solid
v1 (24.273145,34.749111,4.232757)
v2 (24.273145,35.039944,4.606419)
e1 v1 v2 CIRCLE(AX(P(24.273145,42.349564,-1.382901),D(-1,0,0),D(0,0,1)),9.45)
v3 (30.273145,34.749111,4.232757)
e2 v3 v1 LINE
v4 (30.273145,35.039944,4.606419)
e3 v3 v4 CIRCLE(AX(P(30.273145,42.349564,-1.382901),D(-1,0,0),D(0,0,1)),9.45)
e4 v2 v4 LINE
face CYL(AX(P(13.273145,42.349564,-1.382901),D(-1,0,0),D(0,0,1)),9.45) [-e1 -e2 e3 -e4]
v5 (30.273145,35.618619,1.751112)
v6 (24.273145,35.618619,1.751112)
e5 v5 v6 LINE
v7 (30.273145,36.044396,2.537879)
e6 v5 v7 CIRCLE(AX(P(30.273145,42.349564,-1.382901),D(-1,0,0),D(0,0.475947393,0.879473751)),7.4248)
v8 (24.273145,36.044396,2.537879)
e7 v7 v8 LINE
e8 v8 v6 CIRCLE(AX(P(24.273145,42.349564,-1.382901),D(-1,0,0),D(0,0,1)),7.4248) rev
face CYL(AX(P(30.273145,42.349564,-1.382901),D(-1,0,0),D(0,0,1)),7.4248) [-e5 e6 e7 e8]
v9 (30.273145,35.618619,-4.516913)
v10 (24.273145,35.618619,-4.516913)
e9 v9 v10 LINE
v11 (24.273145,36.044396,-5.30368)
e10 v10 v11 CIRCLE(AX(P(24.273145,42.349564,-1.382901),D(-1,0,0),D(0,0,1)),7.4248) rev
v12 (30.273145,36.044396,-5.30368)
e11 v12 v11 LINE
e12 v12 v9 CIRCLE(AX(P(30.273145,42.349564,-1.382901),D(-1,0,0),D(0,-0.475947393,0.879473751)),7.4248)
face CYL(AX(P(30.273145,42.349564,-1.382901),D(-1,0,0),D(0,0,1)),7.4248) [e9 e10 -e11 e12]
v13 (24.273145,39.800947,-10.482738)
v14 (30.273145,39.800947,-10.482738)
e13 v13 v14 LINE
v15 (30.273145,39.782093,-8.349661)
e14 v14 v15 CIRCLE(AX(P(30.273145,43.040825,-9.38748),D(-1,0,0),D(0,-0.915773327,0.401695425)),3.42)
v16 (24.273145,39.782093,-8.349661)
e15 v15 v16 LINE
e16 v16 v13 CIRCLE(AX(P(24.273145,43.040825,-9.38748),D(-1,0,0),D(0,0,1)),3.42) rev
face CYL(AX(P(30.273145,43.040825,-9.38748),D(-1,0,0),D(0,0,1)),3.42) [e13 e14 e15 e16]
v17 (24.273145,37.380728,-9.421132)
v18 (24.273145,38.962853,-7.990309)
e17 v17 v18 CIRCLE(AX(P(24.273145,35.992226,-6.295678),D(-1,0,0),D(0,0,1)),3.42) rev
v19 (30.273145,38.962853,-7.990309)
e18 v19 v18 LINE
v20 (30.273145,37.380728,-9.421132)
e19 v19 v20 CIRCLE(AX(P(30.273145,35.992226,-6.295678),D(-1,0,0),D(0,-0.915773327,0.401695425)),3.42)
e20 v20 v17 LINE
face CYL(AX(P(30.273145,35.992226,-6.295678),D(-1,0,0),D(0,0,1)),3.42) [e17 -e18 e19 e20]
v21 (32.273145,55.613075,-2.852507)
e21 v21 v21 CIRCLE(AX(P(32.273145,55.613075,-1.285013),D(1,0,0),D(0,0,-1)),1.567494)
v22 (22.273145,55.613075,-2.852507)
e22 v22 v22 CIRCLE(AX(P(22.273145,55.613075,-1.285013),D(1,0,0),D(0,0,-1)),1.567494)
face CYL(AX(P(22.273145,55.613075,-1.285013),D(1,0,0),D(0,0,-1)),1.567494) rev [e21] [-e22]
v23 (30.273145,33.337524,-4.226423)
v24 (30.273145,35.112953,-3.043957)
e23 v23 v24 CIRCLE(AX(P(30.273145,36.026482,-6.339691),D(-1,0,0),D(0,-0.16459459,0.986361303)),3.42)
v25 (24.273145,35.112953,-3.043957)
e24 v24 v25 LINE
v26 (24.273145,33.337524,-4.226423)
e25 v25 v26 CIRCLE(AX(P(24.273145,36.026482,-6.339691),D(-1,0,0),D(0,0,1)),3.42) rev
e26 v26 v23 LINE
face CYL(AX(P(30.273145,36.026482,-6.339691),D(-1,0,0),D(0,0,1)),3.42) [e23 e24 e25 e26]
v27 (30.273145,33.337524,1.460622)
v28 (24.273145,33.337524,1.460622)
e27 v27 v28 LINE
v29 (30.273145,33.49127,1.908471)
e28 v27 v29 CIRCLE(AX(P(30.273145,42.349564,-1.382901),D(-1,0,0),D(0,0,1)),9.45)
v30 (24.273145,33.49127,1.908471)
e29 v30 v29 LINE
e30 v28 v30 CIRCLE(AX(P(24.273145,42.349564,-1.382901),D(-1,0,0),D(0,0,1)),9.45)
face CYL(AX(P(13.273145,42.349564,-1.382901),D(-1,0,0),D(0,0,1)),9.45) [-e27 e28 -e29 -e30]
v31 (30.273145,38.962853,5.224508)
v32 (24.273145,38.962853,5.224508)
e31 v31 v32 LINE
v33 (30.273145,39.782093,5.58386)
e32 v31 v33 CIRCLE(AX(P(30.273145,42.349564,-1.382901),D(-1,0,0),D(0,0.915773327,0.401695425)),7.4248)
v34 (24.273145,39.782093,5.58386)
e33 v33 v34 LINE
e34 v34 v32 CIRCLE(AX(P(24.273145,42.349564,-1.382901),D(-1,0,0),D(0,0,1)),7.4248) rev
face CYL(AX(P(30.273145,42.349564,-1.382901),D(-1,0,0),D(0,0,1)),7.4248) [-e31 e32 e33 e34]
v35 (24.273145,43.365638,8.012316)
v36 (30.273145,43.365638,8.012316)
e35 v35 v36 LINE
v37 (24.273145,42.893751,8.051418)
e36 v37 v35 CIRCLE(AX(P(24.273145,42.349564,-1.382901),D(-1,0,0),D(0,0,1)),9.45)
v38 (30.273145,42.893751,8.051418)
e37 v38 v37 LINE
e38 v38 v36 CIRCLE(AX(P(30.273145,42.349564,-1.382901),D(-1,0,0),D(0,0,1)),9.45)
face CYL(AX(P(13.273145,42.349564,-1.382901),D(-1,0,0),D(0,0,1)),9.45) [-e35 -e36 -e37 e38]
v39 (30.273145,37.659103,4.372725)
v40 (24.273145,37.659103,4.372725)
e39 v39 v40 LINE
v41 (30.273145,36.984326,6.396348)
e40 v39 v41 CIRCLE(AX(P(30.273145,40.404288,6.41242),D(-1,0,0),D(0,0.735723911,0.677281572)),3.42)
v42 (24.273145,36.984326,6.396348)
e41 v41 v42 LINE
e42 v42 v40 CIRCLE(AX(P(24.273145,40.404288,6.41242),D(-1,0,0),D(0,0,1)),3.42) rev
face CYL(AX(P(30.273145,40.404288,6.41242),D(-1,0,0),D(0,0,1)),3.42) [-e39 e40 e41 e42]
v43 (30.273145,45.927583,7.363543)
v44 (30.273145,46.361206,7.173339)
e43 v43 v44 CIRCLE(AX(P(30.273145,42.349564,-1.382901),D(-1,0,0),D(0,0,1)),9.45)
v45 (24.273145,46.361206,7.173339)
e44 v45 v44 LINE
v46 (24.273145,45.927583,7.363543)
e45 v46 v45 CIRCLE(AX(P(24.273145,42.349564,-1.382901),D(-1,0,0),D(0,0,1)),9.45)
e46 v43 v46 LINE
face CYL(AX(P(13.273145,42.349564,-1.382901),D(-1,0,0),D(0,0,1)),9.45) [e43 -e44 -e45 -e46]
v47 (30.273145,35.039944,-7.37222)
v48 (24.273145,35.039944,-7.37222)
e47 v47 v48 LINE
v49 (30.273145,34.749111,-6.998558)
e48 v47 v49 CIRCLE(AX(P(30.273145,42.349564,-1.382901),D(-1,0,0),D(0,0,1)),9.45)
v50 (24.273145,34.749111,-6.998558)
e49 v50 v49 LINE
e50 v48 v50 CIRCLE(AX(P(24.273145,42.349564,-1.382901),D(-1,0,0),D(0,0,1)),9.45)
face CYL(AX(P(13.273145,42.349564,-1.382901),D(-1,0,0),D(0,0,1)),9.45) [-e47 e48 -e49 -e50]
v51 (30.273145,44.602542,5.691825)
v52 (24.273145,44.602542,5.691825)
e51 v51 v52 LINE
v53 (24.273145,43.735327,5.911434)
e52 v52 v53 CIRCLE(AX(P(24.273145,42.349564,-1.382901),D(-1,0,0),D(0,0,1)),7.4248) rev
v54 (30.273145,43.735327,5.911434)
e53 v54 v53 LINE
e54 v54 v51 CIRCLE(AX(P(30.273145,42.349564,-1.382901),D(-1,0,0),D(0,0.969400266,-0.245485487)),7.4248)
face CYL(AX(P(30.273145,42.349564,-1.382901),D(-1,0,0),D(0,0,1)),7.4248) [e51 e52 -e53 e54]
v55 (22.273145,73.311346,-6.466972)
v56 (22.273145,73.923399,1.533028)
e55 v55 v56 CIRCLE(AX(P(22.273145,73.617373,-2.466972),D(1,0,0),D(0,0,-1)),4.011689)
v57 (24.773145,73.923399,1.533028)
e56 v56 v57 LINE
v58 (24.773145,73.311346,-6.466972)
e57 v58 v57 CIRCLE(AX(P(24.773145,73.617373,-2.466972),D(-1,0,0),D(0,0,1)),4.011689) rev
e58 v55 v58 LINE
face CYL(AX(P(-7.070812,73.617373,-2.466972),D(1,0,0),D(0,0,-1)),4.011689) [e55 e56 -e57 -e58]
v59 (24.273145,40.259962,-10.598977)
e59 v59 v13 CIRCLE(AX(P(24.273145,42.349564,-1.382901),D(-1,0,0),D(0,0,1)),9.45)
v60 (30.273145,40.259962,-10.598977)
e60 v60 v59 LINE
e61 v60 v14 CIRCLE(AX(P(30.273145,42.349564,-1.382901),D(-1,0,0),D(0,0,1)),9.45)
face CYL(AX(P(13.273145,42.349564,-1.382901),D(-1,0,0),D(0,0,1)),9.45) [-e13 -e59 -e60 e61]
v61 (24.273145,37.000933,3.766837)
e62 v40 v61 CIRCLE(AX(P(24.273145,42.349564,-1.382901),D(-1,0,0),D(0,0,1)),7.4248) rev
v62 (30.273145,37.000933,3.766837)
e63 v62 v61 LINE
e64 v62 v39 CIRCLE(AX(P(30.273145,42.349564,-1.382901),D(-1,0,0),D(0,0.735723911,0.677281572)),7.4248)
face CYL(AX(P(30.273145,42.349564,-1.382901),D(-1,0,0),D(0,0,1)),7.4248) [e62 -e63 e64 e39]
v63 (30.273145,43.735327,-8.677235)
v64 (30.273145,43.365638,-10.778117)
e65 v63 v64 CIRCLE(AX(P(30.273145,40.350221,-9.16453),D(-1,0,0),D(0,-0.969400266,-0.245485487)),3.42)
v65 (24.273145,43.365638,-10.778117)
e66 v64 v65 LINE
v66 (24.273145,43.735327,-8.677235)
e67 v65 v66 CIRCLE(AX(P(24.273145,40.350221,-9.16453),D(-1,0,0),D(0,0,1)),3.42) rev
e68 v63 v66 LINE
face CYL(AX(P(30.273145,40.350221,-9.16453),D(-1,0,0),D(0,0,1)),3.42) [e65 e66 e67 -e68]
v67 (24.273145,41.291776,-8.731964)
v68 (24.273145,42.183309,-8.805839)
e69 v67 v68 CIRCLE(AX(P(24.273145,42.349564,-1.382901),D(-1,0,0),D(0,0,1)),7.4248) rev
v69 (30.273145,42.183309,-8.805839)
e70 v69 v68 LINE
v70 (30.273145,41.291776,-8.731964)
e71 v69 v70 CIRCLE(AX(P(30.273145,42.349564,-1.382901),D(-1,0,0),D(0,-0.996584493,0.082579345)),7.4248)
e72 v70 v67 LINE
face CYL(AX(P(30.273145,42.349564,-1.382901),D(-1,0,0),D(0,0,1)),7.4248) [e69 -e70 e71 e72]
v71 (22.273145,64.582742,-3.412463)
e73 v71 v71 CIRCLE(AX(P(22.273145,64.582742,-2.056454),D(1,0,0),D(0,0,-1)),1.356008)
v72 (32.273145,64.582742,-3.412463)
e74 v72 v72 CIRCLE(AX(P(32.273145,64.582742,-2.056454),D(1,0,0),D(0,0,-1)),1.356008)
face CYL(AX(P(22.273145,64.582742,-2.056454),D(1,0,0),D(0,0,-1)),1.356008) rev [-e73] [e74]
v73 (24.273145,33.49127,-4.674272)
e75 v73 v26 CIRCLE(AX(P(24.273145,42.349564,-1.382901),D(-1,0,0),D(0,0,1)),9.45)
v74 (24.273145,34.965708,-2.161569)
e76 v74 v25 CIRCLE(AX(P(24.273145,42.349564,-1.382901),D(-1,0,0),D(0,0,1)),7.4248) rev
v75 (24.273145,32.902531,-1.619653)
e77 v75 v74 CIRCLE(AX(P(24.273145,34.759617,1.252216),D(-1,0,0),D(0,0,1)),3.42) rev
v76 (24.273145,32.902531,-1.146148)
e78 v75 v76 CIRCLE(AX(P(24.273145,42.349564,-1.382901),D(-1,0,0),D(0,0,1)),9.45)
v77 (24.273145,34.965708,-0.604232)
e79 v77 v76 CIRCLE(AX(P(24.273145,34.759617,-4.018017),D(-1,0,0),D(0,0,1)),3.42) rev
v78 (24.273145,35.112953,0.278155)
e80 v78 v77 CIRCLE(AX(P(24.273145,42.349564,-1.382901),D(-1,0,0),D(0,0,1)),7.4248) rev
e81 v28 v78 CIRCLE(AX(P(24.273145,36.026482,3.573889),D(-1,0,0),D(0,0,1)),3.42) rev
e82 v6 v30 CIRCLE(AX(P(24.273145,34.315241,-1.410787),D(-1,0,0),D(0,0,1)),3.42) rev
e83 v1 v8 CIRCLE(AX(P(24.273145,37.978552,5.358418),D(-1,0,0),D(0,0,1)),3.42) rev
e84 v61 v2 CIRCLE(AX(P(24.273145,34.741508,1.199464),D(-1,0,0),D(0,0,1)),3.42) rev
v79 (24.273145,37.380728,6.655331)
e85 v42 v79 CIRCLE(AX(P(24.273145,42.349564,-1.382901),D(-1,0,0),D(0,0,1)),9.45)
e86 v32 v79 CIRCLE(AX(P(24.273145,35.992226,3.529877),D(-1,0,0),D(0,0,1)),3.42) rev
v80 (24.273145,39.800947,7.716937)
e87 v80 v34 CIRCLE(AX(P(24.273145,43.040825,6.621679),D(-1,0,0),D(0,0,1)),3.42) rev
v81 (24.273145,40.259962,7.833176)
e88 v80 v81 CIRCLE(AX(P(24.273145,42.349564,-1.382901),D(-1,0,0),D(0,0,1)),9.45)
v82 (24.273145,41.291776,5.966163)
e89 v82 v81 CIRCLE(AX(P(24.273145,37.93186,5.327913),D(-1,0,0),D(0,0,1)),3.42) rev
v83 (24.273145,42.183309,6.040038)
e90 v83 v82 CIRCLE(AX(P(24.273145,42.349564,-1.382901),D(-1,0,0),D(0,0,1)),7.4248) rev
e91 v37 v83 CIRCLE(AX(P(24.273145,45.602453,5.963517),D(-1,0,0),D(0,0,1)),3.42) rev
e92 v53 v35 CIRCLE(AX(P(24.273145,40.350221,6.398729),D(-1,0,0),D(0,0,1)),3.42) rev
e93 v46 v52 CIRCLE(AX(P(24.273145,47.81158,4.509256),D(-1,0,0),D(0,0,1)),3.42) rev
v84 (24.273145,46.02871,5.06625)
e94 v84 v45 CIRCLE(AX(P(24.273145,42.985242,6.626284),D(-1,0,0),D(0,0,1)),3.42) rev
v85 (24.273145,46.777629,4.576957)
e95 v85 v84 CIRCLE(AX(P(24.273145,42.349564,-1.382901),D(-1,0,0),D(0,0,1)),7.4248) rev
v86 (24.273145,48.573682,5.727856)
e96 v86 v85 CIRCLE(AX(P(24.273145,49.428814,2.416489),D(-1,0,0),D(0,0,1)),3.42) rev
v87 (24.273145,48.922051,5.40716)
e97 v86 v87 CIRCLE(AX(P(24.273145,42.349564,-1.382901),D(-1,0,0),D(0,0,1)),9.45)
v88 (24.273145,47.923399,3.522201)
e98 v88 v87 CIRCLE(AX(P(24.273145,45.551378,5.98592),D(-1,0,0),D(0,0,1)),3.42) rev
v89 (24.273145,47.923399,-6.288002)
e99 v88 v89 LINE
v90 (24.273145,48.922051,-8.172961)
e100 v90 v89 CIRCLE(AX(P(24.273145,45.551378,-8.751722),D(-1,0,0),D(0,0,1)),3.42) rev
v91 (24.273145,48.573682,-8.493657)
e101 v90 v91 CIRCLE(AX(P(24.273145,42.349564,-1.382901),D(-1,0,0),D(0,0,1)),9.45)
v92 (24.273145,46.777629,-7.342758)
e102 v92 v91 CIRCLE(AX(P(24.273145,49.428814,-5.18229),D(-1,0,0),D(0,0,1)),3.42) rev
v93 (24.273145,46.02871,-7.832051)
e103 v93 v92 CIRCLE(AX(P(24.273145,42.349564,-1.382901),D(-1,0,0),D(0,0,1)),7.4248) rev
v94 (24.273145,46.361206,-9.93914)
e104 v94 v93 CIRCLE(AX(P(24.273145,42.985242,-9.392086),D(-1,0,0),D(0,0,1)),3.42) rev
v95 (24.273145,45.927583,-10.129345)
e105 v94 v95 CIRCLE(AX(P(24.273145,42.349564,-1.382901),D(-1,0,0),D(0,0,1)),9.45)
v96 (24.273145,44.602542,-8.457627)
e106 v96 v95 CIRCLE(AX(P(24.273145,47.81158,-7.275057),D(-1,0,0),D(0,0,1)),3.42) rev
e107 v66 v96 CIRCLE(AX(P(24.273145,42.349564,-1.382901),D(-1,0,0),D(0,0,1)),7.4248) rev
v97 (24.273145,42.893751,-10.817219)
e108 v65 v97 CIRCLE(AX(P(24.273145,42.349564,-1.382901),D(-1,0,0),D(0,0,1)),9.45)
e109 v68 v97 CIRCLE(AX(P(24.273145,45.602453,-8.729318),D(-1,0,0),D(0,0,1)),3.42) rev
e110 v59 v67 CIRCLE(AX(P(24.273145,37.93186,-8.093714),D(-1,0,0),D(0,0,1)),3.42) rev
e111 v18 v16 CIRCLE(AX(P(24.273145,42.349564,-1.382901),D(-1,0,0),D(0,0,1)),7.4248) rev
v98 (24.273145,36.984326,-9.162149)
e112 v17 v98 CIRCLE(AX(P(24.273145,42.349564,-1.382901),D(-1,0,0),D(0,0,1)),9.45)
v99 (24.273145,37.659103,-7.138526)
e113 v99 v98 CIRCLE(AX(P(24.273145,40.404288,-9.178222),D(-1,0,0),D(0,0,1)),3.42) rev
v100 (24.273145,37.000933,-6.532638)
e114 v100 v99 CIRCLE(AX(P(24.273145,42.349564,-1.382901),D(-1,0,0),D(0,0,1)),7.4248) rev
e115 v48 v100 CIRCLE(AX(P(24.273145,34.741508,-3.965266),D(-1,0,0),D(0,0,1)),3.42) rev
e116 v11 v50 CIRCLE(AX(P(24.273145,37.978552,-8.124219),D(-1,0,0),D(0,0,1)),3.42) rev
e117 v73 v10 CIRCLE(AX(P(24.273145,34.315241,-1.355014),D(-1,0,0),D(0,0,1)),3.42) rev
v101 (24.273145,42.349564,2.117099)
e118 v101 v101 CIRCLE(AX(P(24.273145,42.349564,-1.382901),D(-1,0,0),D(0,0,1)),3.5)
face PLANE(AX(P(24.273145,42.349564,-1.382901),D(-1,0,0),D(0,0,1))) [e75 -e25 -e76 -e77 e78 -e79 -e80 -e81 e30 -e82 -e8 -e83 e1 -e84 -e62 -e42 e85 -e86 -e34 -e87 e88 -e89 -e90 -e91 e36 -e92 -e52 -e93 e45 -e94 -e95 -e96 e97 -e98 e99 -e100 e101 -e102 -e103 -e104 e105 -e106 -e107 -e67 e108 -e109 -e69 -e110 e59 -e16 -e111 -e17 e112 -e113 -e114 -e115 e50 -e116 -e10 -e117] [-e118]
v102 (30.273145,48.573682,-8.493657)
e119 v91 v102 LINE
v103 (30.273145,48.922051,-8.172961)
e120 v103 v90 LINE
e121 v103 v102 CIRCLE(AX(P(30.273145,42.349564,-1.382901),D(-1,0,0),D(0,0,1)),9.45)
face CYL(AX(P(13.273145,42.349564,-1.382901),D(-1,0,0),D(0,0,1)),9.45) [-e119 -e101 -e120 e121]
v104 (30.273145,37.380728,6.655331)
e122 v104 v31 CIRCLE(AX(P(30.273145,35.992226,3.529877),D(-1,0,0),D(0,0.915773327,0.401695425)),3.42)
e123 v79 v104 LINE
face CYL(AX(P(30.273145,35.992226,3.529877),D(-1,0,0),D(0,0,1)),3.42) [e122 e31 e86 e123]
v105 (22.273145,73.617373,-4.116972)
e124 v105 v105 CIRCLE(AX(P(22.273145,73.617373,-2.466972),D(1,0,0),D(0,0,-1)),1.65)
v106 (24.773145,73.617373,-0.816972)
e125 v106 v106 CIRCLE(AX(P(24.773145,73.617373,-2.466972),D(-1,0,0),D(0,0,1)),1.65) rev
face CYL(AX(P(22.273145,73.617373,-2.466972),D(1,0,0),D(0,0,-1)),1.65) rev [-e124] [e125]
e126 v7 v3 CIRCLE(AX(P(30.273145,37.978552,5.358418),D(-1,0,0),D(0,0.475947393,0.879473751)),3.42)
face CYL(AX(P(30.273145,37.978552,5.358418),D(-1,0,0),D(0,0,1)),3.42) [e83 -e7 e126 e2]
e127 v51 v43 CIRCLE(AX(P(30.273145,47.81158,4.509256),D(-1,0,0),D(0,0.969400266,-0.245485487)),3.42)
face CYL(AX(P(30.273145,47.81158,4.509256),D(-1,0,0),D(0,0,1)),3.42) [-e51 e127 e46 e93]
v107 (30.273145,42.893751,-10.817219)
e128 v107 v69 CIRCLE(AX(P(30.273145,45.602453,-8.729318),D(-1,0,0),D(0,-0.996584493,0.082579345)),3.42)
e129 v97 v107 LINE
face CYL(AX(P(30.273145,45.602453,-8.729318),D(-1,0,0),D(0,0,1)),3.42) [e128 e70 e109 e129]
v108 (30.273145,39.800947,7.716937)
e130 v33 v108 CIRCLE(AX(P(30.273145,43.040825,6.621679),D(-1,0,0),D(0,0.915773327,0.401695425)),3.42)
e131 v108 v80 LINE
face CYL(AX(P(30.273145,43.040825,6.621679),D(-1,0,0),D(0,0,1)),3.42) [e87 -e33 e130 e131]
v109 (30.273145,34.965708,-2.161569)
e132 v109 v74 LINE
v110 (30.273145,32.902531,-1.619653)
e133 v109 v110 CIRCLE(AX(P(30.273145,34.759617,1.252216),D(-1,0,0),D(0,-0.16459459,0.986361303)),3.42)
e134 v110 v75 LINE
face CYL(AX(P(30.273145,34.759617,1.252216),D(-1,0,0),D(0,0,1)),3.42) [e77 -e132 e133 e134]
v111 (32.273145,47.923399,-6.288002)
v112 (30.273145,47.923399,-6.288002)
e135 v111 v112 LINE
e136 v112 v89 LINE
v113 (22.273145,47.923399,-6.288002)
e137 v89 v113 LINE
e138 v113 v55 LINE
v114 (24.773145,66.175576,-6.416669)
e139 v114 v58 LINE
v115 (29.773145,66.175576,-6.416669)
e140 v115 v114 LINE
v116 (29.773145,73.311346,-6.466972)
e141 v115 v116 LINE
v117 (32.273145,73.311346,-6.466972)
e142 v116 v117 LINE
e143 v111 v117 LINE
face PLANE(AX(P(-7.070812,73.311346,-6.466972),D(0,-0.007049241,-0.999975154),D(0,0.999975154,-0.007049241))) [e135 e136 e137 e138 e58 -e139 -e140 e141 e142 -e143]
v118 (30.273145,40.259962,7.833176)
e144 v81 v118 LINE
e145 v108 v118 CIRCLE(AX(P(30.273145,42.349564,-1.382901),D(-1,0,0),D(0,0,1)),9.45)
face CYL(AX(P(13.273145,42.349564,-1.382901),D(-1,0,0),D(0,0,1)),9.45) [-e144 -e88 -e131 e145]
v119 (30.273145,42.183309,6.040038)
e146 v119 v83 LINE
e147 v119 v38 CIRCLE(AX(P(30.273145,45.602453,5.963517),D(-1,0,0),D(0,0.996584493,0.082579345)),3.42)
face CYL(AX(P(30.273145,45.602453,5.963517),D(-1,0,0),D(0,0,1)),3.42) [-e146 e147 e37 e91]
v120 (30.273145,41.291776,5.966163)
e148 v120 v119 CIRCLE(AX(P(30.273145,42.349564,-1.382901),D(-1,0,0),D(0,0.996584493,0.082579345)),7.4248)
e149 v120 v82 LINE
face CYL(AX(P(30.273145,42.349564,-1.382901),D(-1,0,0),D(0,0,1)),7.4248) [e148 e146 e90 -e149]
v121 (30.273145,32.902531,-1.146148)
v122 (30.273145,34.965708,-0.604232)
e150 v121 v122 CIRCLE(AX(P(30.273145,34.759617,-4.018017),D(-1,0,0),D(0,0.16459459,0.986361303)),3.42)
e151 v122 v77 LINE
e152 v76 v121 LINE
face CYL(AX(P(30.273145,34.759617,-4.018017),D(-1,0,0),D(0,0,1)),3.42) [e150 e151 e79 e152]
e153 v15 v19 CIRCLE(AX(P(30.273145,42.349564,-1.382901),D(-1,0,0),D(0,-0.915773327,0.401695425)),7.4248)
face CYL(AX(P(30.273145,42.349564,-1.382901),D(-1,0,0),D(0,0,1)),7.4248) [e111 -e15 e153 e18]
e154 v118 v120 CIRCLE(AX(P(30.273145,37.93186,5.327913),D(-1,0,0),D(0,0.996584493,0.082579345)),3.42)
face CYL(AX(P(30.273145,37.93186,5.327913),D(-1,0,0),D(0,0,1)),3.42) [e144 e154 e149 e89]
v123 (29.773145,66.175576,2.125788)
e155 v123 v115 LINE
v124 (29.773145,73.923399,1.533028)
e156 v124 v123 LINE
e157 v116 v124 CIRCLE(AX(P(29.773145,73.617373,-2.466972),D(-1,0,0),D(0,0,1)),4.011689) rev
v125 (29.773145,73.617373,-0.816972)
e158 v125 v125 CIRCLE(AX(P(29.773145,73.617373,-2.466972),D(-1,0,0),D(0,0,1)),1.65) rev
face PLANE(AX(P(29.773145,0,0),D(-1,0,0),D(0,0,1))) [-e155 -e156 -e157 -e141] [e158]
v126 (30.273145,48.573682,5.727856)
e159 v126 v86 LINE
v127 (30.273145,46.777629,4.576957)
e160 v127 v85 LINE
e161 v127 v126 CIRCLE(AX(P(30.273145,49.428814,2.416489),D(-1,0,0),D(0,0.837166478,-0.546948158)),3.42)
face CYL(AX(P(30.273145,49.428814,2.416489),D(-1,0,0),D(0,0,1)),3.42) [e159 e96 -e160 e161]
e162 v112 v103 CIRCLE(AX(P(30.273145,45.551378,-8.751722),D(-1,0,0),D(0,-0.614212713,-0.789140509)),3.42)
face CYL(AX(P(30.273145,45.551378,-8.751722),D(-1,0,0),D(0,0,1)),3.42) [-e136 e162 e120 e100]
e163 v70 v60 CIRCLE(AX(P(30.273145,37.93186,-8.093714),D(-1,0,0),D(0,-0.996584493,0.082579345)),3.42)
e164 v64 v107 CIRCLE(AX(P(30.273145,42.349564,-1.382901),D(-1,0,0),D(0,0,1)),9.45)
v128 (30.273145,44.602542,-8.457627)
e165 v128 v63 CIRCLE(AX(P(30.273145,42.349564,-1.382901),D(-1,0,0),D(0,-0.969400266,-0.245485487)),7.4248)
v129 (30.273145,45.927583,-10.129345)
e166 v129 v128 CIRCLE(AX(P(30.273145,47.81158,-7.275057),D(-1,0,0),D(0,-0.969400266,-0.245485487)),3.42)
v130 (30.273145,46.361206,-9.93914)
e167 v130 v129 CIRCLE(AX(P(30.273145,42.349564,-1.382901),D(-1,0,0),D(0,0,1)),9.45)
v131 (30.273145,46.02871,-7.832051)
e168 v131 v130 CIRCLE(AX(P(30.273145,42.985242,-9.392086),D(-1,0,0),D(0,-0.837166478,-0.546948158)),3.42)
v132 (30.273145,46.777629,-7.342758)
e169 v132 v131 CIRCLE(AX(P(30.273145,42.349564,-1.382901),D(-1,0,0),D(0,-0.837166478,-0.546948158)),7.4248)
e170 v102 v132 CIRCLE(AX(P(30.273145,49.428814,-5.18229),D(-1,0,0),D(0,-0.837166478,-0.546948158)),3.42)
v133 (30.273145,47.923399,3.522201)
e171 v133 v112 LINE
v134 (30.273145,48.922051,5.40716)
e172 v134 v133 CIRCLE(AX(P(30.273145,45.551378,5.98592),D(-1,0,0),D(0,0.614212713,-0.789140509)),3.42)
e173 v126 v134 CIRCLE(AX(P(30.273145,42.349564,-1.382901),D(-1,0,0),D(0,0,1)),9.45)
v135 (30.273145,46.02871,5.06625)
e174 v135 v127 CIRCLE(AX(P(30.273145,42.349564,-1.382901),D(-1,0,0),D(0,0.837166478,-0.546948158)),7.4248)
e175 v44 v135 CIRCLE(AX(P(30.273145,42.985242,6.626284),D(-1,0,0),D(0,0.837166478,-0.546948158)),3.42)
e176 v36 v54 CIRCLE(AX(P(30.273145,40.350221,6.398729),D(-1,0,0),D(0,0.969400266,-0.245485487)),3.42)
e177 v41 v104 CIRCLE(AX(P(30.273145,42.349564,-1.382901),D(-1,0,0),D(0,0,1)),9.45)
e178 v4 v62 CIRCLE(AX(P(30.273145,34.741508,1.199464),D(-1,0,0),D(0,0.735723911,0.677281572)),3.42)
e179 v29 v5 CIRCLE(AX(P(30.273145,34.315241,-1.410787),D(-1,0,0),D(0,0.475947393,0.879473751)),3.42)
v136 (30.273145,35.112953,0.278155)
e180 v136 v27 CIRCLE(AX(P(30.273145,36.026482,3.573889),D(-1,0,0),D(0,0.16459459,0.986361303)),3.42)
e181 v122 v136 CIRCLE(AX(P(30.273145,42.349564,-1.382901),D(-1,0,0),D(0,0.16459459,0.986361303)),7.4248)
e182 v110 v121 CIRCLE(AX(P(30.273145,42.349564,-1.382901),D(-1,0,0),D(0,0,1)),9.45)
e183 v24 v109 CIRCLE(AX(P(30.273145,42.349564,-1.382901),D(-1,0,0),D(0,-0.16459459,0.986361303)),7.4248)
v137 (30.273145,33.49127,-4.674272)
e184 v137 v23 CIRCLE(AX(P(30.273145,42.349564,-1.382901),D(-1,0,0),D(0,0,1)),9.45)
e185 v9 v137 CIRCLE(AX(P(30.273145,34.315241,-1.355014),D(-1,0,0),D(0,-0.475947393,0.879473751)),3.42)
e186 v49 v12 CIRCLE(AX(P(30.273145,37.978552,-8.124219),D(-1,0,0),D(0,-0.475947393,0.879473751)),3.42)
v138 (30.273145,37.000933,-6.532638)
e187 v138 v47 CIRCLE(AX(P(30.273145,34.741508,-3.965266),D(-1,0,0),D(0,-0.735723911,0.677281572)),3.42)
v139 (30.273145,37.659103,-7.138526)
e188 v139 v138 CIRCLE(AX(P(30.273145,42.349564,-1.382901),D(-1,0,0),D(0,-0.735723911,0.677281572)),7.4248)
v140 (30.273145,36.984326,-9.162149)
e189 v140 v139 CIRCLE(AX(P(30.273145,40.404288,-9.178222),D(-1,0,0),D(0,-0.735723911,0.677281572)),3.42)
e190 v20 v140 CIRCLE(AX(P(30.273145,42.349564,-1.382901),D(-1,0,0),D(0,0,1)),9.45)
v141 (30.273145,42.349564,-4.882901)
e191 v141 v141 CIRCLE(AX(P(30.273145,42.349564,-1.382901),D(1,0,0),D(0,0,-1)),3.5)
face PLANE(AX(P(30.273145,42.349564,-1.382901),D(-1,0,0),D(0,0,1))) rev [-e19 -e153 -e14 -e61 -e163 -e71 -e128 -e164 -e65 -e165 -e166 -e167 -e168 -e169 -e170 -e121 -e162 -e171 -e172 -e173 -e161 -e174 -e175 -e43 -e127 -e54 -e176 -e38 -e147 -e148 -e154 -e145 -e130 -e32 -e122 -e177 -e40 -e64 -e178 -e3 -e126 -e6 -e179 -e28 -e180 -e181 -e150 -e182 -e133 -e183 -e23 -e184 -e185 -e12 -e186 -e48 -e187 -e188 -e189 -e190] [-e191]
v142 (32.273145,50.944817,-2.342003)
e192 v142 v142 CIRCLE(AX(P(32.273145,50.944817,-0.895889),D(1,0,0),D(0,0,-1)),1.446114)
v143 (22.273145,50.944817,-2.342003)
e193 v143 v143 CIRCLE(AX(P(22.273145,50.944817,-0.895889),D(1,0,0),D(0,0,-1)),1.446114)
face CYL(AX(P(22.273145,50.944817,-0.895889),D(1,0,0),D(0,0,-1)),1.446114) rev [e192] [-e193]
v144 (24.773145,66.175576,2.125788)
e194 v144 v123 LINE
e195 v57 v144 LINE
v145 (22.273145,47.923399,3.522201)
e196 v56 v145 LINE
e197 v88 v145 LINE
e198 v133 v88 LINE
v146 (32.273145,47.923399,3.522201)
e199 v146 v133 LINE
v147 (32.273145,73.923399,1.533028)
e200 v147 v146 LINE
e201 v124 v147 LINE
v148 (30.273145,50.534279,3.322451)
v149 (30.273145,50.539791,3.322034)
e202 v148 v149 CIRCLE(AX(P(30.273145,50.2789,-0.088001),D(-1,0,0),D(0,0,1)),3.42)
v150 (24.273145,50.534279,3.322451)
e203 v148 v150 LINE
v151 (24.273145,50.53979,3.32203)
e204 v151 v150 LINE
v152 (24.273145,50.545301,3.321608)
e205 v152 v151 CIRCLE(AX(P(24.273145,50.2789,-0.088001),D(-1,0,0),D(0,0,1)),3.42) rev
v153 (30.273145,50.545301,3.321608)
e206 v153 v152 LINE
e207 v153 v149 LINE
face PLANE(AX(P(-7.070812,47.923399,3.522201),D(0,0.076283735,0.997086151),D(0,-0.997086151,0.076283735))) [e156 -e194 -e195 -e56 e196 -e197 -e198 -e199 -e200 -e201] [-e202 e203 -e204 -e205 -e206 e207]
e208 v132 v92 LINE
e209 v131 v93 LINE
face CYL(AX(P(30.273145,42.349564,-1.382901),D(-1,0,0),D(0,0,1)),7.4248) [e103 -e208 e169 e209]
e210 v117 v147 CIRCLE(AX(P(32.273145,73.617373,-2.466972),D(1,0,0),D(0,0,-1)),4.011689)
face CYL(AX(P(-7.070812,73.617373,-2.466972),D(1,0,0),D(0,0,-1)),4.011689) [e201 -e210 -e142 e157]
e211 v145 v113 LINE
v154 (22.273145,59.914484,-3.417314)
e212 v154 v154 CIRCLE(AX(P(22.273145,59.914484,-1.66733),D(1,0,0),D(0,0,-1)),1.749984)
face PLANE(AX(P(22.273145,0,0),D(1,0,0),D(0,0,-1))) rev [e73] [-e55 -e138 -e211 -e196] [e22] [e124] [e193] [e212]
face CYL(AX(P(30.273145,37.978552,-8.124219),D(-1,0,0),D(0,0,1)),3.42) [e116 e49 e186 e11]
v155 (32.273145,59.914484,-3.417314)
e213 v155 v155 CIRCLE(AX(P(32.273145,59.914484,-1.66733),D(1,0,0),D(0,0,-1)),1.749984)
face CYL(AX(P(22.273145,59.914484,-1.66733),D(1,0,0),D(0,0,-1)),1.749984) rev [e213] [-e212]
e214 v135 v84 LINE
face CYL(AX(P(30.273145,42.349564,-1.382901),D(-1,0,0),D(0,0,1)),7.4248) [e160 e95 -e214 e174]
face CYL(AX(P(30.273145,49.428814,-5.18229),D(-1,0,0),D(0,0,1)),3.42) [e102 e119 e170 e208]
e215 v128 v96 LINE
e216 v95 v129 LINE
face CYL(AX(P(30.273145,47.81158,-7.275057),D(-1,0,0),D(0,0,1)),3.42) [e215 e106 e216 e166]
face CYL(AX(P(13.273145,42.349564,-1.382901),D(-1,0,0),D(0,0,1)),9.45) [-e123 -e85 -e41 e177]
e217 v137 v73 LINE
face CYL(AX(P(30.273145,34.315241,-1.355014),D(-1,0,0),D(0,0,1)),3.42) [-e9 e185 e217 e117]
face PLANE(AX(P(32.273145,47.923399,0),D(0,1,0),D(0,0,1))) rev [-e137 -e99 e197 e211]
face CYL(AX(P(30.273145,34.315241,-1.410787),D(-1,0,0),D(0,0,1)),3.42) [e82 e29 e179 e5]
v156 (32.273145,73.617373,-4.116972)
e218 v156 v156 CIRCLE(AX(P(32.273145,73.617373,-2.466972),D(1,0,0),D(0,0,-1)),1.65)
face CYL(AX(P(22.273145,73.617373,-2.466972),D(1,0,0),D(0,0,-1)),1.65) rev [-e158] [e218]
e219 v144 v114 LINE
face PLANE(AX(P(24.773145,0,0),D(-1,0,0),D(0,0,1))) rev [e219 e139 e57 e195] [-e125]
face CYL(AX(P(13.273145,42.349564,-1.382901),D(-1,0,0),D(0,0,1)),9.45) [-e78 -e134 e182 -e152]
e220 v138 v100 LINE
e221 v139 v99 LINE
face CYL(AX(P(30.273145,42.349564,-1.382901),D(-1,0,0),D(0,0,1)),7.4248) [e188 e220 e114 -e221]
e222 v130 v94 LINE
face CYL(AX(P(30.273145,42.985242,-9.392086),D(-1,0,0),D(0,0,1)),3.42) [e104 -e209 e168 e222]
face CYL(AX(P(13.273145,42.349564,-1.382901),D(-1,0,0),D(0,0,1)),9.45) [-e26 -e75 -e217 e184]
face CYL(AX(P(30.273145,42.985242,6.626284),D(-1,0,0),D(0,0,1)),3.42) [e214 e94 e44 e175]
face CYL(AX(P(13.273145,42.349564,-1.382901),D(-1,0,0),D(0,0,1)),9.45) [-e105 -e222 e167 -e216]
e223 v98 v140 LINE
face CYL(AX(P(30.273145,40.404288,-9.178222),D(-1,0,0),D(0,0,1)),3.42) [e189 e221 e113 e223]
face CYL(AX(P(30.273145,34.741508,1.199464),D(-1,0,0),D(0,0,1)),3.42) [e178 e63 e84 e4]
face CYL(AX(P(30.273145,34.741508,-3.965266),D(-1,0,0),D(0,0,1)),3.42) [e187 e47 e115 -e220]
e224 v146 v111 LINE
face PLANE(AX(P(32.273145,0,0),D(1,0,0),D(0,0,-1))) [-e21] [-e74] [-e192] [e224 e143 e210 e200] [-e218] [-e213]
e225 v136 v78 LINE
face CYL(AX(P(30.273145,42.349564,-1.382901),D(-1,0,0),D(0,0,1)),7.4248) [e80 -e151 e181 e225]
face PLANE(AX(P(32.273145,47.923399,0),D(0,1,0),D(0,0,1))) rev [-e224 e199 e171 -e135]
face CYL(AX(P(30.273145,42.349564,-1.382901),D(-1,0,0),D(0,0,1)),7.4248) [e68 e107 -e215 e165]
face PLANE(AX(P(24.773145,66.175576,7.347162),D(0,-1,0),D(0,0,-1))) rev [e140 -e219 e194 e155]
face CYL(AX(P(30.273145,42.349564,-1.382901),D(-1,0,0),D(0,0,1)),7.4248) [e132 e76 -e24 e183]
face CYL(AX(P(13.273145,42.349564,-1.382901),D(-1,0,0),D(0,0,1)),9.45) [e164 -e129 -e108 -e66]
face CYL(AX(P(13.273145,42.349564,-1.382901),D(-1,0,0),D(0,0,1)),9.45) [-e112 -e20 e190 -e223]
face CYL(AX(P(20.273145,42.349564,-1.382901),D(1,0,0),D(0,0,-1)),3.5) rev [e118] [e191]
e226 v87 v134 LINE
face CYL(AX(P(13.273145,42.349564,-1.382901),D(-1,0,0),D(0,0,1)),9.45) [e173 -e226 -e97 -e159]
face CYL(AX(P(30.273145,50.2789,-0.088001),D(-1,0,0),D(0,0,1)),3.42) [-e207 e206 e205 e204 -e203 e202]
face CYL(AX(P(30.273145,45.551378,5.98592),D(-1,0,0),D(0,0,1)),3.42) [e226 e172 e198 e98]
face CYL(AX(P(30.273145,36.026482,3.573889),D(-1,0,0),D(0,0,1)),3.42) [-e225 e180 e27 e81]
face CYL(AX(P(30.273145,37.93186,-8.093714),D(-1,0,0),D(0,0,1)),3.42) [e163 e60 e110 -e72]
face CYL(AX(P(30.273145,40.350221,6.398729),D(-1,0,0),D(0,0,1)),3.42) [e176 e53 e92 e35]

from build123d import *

# Parameters (mm, degrees)
SPUR_START             = -32.726855157
SPUR_GEAR_GB_OUTLINE_R = 22.5
SPUR_GEAR_GB_DEPTH     = 75
SKETCH_2_R             = 56.152658256
CUT_EXTRUDE_1_DEPTH    = 45
EXTRUDE_1_DEPTH        = 30
EXTRUDE_START          = -30
SKETCH_5_R             = 22.5
EXTRUDE_2_DEPTH        = 30
SCALE_1_SCALE          = 0.2
CUT_EXTRUDE_3_DEPTH    = 10
EXTRUDE_3_DEPTH        = 5
SKETCH_8_R             = 1.65
CUT_EXTRUDE_4_DEPTH    = 10
SKETCH_9_W             = 18.454746183
SKETCH_9_H             = 13.449677925
CUT_EXTRUDE_5_DEPTH    = 2.5
SKETCH_10_R            = 1.446114005
SKETCH_10_R_2          = 1.567494057
SKETCH_10_R_3          = 1.749983797
SKETCH_10_R_4          = 1.35600832
CUT_EXTRUDE_6_DEPTH    = 80.014451116


# Read off the part's stored shape, not the designer's step: spur gear_gb
with BuildPart() as part:
    # spur gear_gb outline → spur gear_gb (new body)
    with BuildSketch(Plane.YZ.offset(SPUR_START)):
        with BuildLine():
            ThreePointArc((32.862431273, 33.858374177), (32.001554259, 34.671025411), (31.120587981, 35.461853886))
            ThreePointArc((31.120587981, 35.461853886), (26.170323532, 33.302671085), (22.140322459, 29.707357493))
            ThreePointArc((22.140322459, 29.707357493), (20.304903422, 30.987038971), (18.395725829, 32.153824573))
            ThreePointArc((18.395725829, 32.153824573), (20.069385125, 37.288613083), (20.058208562, 42.689267077))
            ThreePointArc((20.058208562, 42.689267077), (18.980108815, 43.178360316), (17.890094133, 43.64029024))
            ThreePointArc((17.890094133, 43.64029024), (13.909134176, 39.99074968), (11.264886092, 35.281700885))
            ThreePointArc((11.264886092, 35.281700885), (9.113403224, 35.896086104), (6.928815473, 36.379743093))
            ThreePointArc((6.928815473, 36.379743093), (6.844528189, 41.779750883), (5.080367717, 46.884153523))
            ThreePointArc((5.080367717, 46.884153523), (3.901874073, 46.996687926), (2.720930993, 47.079662024))
            ThreePointArc((2.720930993, 47.079662024), (0.14067431, 42.335248053), (-0.831275476, 37.022762562))
            ThreePointArc((-0.831275476, 37.022762562), (-3.065675621, 36.90527335), (-5.28893955, 36.653389986))
            ThreePointArc((-5.28893955, 36.653389986), (-7.12203958, 41.733442422), (-10.448009799, 45.988452479))
            ThreePointArc((-10.448009799, 45.988452479), (-11.599189267, 45.712233197), (-12.74308724, 45.407259939))
            ThreePointArc((-12.74308724, 45.407259939), (-13.643029801, 40.082103428), (-12.837355447, 34.741871474))
            ThreePointArc((-12.837355447, 34.741871474), (-14.912540945, 33.90523961), (-16.933555907, 32.945111364))
            ThreePointArc((-16.933555907, 32.945111364), (-20.316823851, 37.154705941), (-24.844183336, 40.099227051))
            ThreePointArc((-24.844183336, 40.099227051), (-25.843300471, 39.464186729), (-26.826194241, 38.804314699))
            ThreePointArc((-26.826194241, 38.804314699), (-25.948299939, 33.475478984), (-23.452308764, 28.686197563))
            ThreePointArc((-23.452308764, 28.686197563), (-25.143401065, 27.221085091), (-26.74315873, 25.656756756))
            ThreePointArc((-26.74315873, 25.656756756), (-31.309965009, 28.539718582), (-36.548104111, 29.854666195))
            ThreePointArc((-36.548104111, 29.854666195), (-37.286889069, 28.929621306), (-38.002266845, 27.986357877))
            ThreePointArc((-38.002266845, 27.986357877), (-35.44166915, 23.231304993), (-31.525840525, 19.51196706))
            ThreePointArc((-31.525840525, 19.51196706), (-32.64958354, 17.577141651), (-33.654725342, 15.578132475))
            ThreePointArc((-33.654725342, 15.578132475), (-38.910185635, 16.822047902), (-44.291470704, 16.364927041))
            ThreePointArc((-44.291470704, 16.364927041), (-44.68986467, 15.250120552), (-45.060204171, 14.125682952))
            ThreePointArc((-45.060204171, 14.125682952), (-41.094383574, 10.459696662), (-36.183058293, 8.213350193))
            ThreePointArc((-36.183058293, 8.213350193), (-36.617677028, 6.018480201), (-36.919280256, 3.801413847))
            ThreePointArc((-36.919280256, 3.801413847), (-42.293883893, 3.271485337), (-47.235169193, 1.091832139))
            ThreePointArc((-47.235169193, 1.091832139), (-47.25, -0.091929368), (-47.235169193, -1.275690876))
            ThreePointArc((-47.235169193, -1.275690876), (-42.293883893, -3.455344074), (-36.919280256, -3.985272584))
            ThreePointArc((-36.919280256, -3.985272584), (-36.617677028, -6.202338938), (-36.183058293, -8.39720893))
            ThreePointArc((-36.183058293, -8.39720893), (-41.094383574, -10.643555399), (-45.060204171, -14.309541689))
            ThreePointArc((-45.060204171, -14.309541689), (-44.68986467, -15.433979288), (-44.291470704, -16.548785777))
            ThreePointArc((-44.291470704, -16.548785777), (-38.910185635, -17.005906639), (-33.654725342, -15.761991212))
            ThreePointArc((-33.654725342, -15.761991212), (-32.64958354, -17.761000388), (-31.525840525, -19.695825796))
            ThreePointArc((-31.525840525, -19.695825796), (-35.44166915, -23.41516373), (-38.002266845, -28.170216613))
            ThreePointArc((-38.002266845, -28.170216613), (-37.286889069, -29.113480043), (-36.548104111, -30.038524932))
            ThreePointArc((-36.548104111, -30.038524932), (-31.309965009, -28.723577319), (-26.74315873, -25.840615493))
            ThreePointArc((-26.74315873, -25.840615493), (-25.143401065, -27.404943828), (-23.452308764, -28.870056299))
            ThreePointArc((-23.452308764, -28.870056299), (-25.948299939, -33.65933772), (-26.826194241, -38.988173435))
            ThreePointArc((-26.826194241, -38.988173435), (-25.843300471, -39.648045466), (-24.844183336, -40.283085788))
            ThreePointArc((-24.844183336, -40.283085788), (-20.316823851, -37.338564677), (-16.933555907, -33.128970101))
            ThreePointArc((-16.933555907, -33.128970101), (-14.912540945, -34.089098347), (-12.837355447, -34.925730211))
            ThreePointArc((-12.837355447, -34.925730211), (-13.643029801, -40.265962164), (-12.74308724, -45.591118675))
            ThreePointArc((-12.74308724, -45.591118675), (-11.599189267, -45.896091934), (-10.448009799, -46.172311216))
            ThreePointArc((-10.448009799, -46.172311216), (-7.12203958, -41.917301159), (-5.28893955, -36.837248723))
            ThreePointArc((-5.28893955, -36.837248723), (-3.065675621, -37.089132087), (-0.831275476, -37.206621299))
            ThreePointArc((-0.831275476, -37.206621299), (0.14067431, -42.51910679), (2.720930993, -47.263520761))
            ThreePointArc((2.720930993, -47.263520761), (3.901874073, -47.180546663), (5.080367717, -47.06801226))
            ThreePointArc((5.080367717, -47.06801226), (6.844528189, -41.96360962), (6.928815473, -36.56360183))
            ThreePointArc((6.928815473, -36.56360183), (9.113403224, -36.079944841), (11.264886092, -35.465559622))
            ThreePointArc((11.264886092, -35.465559622), (13.909134176, -40.174608417), (17.890094133, -43.824148977))
            ThreePointArc((17.890094133, -43.824148977), (18.980108815, -43.362219053), (20.058208562, -42.873125814))
            ThreePointArc((20.058208562, -42.873125814), (20.069385125, -37.47247182), (18.395725829, -32.33768331))
            ThreePointArc((18.395725829, -32.33768331), (20.304903422, -31.170897707), (22.140322459, -29.891216229))
            ThreePointArc((22.140322459, -29.891216229), (26.170323532, -33.486529822), (31.120587981, -35.645712623))
            ThreePointArc((31.120587981, -35.645712623), (32.001554259, -34.854884148), (32.862431273, -34.042232914))
            ThreePointArc((32.862431273, -34.042232914), (31.119412774, -28.930572226), (27.869173851, -24.617437006))
            ThreePointArc((27.869173851, -24.617437006), (29.296052271, -22.893962115), (30.616511345, -21.087657722))
            ThreePointArc((30.616511345, -21.087657722), (35.595552259, -23.179628097), (40.978683235, -23.614472179))
            ThreePointArc((40.978683235, -23.614472179), (41.555134745, -22.58044369), (42.105499643, -21.532297832))
            ThreePointArc((42.105499643, -21.532297832), (38.797169181, -17.2635582), (34.322564452, -14.239471396))
            ThreePointArc((34.322564452, -14.239471396), (35.112519281, -12.146072463), (35.774926162, -10.008886264))
            ThreePointArc((35.774926162, -10.008886264), (41.163450577, -10.370815972), (46.396102311, -9.034199232))
            ThreePointArc((46.396102311, -9.034199232), (46.605571586, -7.869023759), (46.785783792, -6.698966145))
            ThreePointArc((46.785783792, -6.698966145), (42.270650308, -3.735731746), (37.056572625, -2.328400087))
            ThreePointArc((37.056572625, -2.328400087), (37.124, -0.091929368), (37.056572625, 2.14454135))
            ThreePointArc((37.056572625, 2.14454135), (42.270650308, 3.551873009), (46.785783792, 6.515107408))
            ThreePointArc((46.785783792, 6.515107408), (46.605571586, 7.685165023), (46.396102311, 8.850340496))
            ThreePointArc((46.396102311, 8.850340496), (41.163450577, 10.186957235), (35.774926162, 9.825027527))
            ThreePointArc((35.774926162, 9.825027527), (35.112519281, 11.962213726), (34.322564452, 14.05561266))
            ThreePointArc((34.322564452, 14.05561266), (38.797169181, 17.079699464), (42.105499643, 21.348439095))
            ThreePointArc((42.105499643, 21.348439095), (41.555134745, 22.396584953), (40.978683235, 23.430613443))
            ThreePointArc((40.978683235, 23.430613443), (35.595552259, 22.99576936), (30.616511345, 20.903798985))
            ThreePointArc((30.616511345, 20.903798985), (29.296052271, 22.710103378), (27.869173851, 24.433578269))
            ThreePointArc((27.869173851, 24.433578269), (31.119412774, 28.746713489), (32.862431273, 33.858374177))
        make_face()
        with Locations((0, -0.091929368)):
            Circle(SPUR_GEAR_GB_OUTLINE_R, mode=Mode.SUBTRACT)
    extrude(amount=SPUR_GEAR_GB_DEPTH)

    # 草图2 → 切除-拉伸1 (cut)
    with BuildSketch(Plane.ZY.offset(32.726855157)):
        with Locations((-0.091929368, 0)):
            Circle(SKETCH_2_R)
    extrude(amount=-CUT_EXTRUDE_1_DEPTH, mode=Mode.SUBTRACT)

    # 草图4 → 凸台-拉伸1 (add)
    with BuildSketch(Plane(origin=(42.273144843, 0, 0), x_dir=(0, 0, -1), z_dir=(1, 0, 0))):
        with BuildLine():
            Line((-24.433578269, 27.869173851), (-23.430613443, 40.978683235))
            Line((-23.430613443, 40.978683235), (-14.487711984, 157.869173851))
            ThreePointArc((-14.487711984, 157.869173851), (7.042421291, 176.339040577), (25.512288016, 154.808907302))
            Line((25.512288016, 154.808907302), (24.617437006, 27.869173851))
            Line((24.617437006, 27.869173851), (-24.433578269, 27.869173851))
        make_face()
    extrude(amount=-EXTRUDE_1_DEPTH)

    # 草图5 → 凸台-拉伸2 (add)
    with BuildSketch(Plane(origin=(42.273144843, 0, 0), x_dir=(0, 0, -1), z_dir=(1, 0, 0)).offset(EXTRUDE_START)):
        with Locations((0.091929368, 0)):
            Circle(SKETCH_5_R)
    extrude(amount=EXTRUDE_2_DEPTH)


with BuildPart() as part_1:
    # 缩放比例1: scaled about (27.273144843, 52.936955481, -1.705643422)
    add(part.part.scale(SCALE_1_SCALE).moved(Location((21.818515874, 42.349564385, -1.364514738))))

    # 草图6 → 切除-拉伸3 (cut)
    with BuildSketch(Plane(origin=(30.273144843, 0, 0), x_dir=(0, 0, -1), z_dir=(1, 0, 0))):
        with BuildLine():
            ThreePointArc((1.382900611, 38.849564385), (4.342900611, 44.217290275), (-1.776224322, 43.856192956))
            ThreePointArc((-1.776224322, 43.856192956), (-1.577099389, 40.481838495), (1.382900611, 38.849564385))
        make_face()
    extrude(amount=-CUT_EXTRUDE_3_DEPTH, mode=Mode.SUBTRACT)

    # 草图7 → 凸台-拉伸3 (add, symmetric)
    with BuildSketch(Plane(origin=(27.273144843, 0, 0), x_dir=(0, 0, -1), z_dir=(1, 0, 0))):
        with BuildLine():
            Line((6.288002139, 47.923399155), (6.466972341, 73.311345845))
            ThreePointArc((6.466972341, 73.311345845), (2.772998996, 77.6173725), (-1.533027659, 73.923399155))
            Line((-1.533027659, 73.923399155), (-3.321607951, 50.545301032))
            Line((-3.321607951, 50.545301032), (-3.322451181, 50.53427937))
            Line((-3.322451181, 50.53427937), (-3.522200916, 47.923399155))
            Line((-3.522200916, 47.923399155), (6.288002139, 47.923399155))
        make_face()
    extrude(amount=EXTRUDE_3_DEPTH, both=True)

    # 草图8 → 切除-拉伸4 (cut)
    with BuildSketch(Plane(origin=(32.273144843, 0, 0), x_dir=(0, 0, -1), z_dir=(1, 0, 0))):
        with Locations((2.466972341, 73.6173725)):
            Circle(SKETCH_8_R)
    extrude(amount=-CUT_EXTRUDE_4_DEPTH, mode=Mode.SUBTRACT)

    # 草图9 → 切除-拉伸5 (cut, symmetric)
    with BuildSketch(Plane(origin=(27.273144843, 0, 0), x_dir=(0, 0, -1), z_dir=(1, 0, 0))):
        with Locations((1.880211444, 72.900415106)):
            Rectangle(SKETCH_9_W, SKETCH_9_H)
    extrude(amount=CUT_EXTRUDE_5_DEPTH, both=True, mode=Mode.SUBTRACT)

    # 草图10 → 切除-拉伸6 (cut, through all)
    with BuildSketch(Plane(origin=(32.273144843, 0, 0), x_dir=(0, 0, -1), z_dir=(1, 0, 0))):
        with Locations((0.89588905, 50.944816989)):
            Circle(SKETCH_10_R)
        with Locations((1.285013172, 55.613074907)):
            Circle(SKETCH_10_R_2)
        with Locations((1.667330314, 59.914483987)):
            Circle(SKETCH_10_R_3)
        with Locations((2.056454436, 64.582741905)):
            Circle(SKETCH_10_R_4)
    extrude(amount=-CUT_EXTRUDE_6_DEPTH, mode=Mode.SUBTRACT)


solid = part_1.part
